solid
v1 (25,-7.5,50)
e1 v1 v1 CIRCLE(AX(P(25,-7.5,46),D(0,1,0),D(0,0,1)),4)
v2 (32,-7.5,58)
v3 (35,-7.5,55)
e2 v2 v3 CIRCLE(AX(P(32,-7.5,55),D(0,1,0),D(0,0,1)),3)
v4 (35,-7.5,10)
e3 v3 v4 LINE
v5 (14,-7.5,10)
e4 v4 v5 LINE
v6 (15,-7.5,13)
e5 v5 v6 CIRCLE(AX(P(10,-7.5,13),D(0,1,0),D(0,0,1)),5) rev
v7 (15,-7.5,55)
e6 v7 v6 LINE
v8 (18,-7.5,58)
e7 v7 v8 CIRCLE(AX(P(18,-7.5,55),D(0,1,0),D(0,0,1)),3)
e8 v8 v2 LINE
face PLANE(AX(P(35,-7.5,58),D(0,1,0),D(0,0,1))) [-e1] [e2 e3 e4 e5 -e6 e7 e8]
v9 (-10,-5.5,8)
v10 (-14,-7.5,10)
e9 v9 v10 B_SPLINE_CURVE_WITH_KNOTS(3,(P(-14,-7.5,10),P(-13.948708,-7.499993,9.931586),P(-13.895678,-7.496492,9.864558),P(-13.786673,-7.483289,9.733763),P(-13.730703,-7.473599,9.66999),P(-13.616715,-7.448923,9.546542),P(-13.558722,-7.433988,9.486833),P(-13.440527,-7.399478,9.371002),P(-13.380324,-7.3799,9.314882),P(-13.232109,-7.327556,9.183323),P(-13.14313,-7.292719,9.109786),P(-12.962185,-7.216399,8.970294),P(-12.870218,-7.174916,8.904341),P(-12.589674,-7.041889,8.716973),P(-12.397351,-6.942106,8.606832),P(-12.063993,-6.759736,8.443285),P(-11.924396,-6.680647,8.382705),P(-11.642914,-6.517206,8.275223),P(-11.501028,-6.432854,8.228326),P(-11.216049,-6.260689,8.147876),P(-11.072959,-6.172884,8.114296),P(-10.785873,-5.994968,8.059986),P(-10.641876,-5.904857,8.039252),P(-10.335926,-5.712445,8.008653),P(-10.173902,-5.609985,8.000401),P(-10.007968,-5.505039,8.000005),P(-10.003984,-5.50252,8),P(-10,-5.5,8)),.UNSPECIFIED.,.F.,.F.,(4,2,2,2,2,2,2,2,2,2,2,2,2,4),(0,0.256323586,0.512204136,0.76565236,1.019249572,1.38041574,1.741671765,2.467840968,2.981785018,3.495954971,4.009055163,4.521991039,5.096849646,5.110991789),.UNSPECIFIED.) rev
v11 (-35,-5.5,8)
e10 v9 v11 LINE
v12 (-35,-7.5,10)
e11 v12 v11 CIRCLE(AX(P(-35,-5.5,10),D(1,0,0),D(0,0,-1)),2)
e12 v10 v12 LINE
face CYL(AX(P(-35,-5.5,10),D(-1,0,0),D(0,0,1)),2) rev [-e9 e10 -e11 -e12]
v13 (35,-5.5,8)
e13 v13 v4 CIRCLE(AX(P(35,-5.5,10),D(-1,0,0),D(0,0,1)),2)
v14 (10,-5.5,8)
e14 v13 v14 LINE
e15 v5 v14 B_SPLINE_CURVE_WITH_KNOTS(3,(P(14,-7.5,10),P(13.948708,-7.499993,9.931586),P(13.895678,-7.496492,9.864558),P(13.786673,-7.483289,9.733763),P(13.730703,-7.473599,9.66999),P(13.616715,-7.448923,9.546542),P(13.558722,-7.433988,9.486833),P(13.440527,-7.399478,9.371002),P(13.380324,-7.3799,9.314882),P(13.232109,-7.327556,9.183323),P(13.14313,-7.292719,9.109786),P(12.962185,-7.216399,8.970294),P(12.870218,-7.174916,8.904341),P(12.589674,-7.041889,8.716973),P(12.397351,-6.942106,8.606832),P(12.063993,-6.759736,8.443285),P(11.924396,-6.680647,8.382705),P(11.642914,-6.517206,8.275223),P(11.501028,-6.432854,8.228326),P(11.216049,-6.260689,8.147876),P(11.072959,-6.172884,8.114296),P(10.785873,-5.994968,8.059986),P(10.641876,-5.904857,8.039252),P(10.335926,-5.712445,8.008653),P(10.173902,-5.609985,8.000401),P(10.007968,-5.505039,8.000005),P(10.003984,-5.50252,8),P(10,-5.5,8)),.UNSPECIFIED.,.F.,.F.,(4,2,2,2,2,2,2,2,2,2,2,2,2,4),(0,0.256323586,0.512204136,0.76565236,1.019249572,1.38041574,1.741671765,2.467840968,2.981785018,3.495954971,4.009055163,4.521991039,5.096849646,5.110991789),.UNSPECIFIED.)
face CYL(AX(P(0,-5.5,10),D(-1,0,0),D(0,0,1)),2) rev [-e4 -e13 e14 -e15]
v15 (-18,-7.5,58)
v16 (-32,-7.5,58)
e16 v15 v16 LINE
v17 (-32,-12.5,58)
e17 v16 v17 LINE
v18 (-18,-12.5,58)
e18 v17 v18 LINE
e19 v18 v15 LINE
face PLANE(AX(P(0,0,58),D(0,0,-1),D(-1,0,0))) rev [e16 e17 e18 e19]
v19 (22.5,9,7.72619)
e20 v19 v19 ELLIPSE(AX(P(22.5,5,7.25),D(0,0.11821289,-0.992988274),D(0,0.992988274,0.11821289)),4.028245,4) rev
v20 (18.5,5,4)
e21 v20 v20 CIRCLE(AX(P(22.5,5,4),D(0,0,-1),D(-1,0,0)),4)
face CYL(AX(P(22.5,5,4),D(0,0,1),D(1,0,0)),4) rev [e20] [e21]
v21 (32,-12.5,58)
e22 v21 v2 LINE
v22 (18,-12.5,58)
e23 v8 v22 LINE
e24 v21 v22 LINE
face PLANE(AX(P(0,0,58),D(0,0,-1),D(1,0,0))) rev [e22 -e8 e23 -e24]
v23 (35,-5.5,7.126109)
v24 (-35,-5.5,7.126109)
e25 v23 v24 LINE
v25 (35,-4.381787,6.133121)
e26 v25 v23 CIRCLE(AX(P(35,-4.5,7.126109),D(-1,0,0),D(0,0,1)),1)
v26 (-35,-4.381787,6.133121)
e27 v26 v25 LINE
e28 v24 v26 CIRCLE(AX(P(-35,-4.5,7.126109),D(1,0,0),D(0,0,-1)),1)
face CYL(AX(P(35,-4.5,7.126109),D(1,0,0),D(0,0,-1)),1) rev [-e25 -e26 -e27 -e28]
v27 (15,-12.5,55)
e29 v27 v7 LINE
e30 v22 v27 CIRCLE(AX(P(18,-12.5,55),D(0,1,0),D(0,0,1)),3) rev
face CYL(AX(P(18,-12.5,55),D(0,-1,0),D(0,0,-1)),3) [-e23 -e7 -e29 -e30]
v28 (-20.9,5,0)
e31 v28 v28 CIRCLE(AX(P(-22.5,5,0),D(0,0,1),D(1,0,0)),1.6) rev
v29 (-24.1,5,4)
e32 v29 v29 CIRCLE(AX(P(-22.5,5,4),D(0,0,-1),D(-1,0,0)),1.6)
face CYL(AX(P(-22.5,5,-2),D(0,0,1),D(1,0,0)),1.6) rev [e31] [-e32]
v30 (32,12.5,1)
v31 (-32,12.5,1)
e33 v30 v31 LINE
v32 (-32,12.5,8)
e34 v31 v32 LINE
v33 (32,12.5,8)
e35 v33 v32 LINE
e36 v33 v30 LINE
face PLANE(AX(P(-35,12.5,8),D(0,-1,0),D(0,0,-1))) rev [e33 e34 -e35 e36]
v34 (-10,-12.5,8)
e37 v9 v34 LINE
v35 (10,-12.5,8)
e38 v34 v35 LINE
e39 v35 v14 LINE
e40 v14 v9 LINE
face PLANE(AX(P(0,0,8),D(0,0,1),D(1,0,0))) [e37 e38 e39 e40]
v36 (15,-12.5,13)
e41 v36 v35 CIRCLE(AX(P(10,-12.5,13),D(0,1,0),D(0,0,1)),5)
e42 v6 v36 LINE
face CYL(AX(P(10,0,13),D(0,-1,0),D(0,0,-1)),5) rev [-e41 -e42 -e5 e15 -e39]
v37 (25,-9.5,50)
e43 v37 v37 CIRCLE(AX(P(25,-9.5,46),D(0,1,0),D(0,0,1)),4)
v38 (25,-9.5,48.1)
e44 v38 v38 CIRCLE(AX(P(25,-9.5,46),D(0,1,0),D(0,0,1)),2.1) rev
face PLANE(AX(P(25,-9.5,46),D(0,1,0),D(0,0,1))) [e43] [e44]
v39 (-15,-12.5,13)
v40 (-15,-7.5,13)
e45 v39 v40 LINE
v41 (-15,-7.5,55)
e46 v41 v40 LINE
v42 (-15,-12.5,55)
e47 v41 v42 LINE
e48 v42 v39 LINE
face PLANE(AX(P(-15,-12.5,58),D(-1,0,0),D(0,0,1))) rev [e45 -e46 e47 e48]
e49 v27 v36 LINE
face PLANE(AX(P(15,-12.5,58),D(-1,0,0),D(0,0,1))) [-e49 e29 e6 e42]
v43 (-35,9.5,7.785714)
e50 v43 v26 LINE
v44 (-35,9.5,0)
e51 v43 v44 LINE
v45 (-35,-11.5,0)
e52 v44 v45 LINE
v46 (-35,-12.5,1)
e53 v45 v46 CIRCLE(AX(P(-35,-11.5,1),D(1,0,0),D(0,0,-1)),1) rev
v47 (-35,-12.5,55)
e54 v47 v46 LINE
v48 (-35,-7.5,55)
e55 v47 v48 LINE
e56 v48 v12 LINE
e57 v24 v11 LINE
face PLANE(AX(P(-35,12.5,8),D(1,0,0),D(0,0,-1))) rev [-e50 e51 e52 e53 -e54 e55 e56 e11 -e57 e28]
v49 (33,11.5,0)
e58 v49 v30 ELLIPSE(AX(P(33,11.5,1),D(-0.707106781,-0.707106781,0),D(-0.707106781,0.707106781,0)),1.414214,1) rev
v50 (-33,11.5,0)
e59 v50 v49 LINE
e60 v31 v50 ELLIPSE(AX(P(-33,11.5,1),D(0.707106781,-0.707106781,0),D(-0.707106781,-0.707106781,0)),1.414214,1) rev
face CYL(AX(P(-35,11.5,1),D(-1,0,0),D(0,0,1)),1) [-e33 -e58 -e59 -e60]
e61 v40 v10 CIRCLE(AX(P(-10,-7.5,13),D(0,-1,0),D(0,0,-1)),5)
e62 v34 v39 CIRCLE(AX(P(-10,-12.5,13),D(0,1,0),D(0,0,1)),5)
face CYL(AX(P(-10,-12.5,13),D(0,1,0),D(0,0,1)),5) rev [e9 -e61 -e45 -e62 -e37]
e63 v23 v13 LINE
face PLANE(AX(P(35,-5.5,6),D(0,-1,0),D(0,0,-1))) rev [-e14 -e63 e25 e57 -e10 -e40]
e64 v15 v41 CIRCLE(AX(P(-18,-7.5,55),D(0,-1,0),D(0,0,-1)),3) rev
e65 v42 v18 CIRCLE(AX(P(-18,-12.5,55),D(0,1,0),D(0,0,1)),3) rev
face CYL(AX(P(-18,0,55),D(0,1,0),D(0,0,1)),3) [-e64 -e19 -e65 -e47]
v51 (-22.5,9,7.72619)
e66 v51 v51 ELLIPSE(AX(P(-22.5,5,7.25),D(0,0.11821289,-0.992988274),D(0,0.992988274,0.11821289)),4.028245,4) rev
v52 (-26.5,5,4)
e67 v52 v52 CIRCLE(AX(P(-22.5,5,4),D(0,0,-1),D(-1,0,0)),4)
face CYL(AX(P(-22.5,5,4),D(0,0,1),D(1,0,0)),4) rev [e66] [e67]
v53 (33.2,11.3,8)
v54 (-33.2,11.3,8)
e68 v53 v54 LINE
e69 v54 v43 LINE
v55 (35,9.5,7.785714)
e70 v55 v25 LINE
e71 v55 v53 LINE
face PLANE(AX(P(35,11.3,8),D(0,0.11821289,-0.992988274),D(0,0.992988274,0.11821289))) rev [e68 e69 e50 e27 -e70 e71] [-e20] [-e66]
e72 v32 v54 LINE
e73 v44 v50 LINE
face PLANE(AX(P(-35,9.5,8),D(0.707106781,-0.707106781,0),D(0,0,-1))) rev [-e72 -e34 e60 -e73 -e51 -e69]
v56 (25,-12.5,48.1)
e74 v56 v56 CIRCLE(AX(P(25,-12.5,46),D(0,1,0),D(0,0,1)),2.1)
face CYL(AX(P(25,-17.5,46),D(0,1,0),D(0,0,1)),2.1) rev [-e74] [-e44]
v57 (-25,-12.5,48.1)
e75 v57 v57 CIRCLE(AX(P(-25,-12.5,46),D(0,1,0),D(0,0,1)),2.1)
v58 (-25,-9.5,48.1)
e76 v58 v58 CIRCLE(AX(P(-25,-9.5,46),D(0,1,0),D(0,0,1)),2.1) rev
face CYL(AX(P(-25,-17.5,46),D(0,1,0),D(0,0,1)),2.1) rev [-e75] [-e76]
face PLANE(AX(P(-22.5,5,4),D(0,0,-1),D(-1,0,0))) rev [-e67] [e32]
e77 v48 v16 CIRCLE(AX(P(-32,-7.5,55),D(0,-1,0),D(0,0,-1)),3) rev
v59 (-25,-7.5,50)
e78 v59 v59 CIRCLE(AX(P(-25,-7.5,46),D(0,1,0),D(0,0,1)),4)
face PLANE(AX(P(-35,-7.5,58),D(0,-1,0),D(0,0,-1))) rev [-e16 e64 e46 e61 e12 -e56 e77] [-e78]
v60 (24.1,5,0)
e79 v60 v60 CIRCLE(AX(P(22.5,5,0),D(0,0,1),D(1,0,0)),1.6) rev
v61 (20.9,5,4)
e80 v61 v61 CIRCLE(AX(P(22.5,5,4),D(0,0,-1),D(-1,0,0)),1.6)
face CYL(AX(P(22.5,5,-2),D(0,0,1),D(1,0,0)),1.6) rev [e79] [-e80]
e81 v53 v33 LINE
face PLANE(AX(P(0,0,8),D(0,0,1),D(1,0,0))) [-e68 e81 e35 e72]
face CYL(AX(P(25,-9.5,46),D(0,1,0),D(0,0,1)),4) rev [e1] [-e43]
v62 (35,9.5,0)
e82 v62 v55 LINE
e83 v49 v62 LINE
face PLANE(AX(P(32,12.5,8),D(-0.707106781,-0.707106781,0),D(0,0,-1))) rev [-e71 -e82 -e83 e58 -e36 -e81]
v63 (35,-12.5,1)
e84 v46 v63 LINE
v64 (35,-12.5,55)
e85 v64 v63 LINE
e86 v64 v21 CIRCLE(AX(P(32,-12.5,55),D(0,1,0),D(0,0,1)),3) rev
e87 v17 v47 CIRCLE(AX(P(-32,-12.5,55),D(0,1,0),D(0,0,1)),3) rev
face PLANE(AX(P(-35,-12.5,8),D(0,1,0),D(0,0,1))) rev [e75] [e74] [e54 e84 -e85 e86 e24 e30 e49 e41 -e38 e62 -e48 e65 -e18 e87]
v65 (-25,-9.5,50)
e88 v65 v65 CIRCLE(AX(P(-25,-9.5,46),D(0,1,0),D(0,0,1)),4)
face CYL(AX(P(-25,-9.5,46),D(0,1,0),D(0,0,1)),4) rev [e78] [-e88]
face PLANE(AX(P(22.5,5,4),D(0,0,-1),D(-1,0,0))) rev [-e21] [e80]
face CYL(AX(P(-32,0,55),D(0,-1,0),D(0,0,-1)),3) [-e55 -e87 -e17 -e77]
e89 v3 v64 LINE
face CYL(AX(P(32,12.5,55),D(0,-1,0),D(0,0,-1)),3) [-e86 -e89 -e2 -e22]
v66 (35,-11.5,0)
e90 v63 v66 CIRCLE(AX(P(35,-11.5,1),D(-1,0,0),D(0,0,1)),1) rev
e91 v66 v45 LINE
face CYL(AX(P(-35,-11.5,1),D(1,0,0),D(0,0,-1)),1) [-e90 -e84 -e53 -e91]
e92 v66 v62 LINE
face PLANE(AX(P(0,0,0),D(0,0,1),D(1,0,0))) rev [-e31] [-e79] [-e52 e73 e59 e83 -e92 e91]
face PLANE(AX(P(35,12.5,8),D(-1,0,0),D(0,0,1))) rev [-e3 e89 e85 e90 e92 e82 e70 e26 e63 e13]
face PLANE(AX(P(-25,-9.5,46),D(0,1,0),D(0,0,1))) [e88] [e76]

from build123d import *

# Parameters (mm, degrees)
SKETCH1_W           = 70
SKETCH1_H           = 25
BOSS_EXTRUDE1_DEPTH = 8
SKETCH4_W           = 20
SKETCH4_H           = 5
BOSS_EXTRUDE2_DEPTH = 50
CHAMFER1_SIZE       = 3
CUT_EXTRUDE5_DEPTH  = 92.761920207
FILLET13_R          = 5
FILLET14_R          = 2
FILLET15_R          = 1
SKETCH11_R          = 2.1
CUT_EXTRUDE6_DEPTH  = 10
FILLET18_R          = 3
FILLET20_R          = 1
SKETCH16_R          = 1.6
CUT_EXTRUDE11_DEPTH = 10
SKETCH17_R          = 4
CUT_EXTRUDE12_DEPTH = 4
SKETCH18_R          = 4
CUT_EXTRUDE13_DEPTH = 2


with BuildPart() as part:
    # Sketch1 → Boss-Extrude1 (new body)
    with BuildSketch(Plane.XY):
        Rectangle(SKETCH1_W, SKETCH1_H)
    extrude(amount=BOSS_EXTRUDE1_DEPTH)

    # Sketch4 → Boss-Extrude2 (add)
    with BuildSketch(Plane.XY.offset(8)):
        with Locations((-25, -10)):
            Rectangle(SKETCH4_W, SKETCH4_H)
    boss_extrude2 = extrude(amount=BOSS_EXTRUDE2_DEPTH)

    # Mirror1: Boss-Extrude2 across plane
    add(boss_extrude2.mirror(Plane.ZY))

    # Chamfer1
    chamfer1_edges = [part.edges().sort_by_distance(p)[0] for p in [
        (-35, 12.5, 4),
        (35, 12.5, 4),
    ]]
    chamfer(chamfer1_edges, length=CHAMFER1_SIZE)

    # Sketch10 → Cut-Extrude5 (cut, through all)
    with BuildSketch(Plane.ZY.offset(35)):
        Polygon((8, 11.3), (6, -5.5), (8, -5.5), align=None)
    extrude(amount=-CUT_EXTRUDE5_DEPTH, mode=Mode.SUBTRACT)

    # Fillet13
    fillet13_edges = [part.edges().sort_by_distance(p)[0] for p in [
        (-15, -10, 8),
        (15, -10, 8),
    ]]
    fillet(fillet13_edges, radius=FILLET13_R)

    # Fillet14
    fillet14_edges = [part.edges().sort_by_distance(p)[0] for p in [
        (22.5, -7.5, 8),
        (-22.5, -7.5, 8),
    ]]
    fillet(fillet14_edges, radius=FILLET14_R - 0.0001)  # a hair under: the kernel refuses the full size

    # Fillet15
    fillet15_edges = [part.edges().sort_by_distance(p)[0] for p in [
        (0, 12.5, 0),
        (0, -12.5, 0),
    ]]
    fillet(fillet15_edges, radius=FILLET15_R)

    # Sketch11 → Cut-Extrude6 (cut)
    with BuildSketch(Plane(origin=(0, -7.5, 0), x_dir=(1, 0, 0), z_dir=(0, 1, 0))):
        with Locations(Location((-25, -46, 0), (0, 0, 270))):
            Circle(SKETCH11_R)
        with Locations(Location((25, -46, 0), (0, 0, 270))):
            Circle(SKETCH11_R)
    extrude(amount=-CUT_EXTRUDE6_DEPTH, mode=Mode.SUBTRACT)

    # Fillet18
    fillet18_edges = [part.edges().sort_by_distance(p)[0] for p in [
        (-35, -10, 58),
        (-15, -10, 58),
        (35, -10, 58),
        (15, -10, 58),
    ]]
    fillet(fillet18_edges, radius=FILLET18_R)

    # Fillet20
    fillet20_edges = [part.edges().sort_by_distance(p)[0] for p in [
        (0, -5.5, 6),
    ]]
    fillet(fillet20_edges, radius=FILLET20_R)

    # Sketch16 → Cut-Extrude11 (cut)
    with BuildSketch(Plane(origin=(0, 0, 8), x_dir=(-1, 0, 0), z_dir=(0, 0, -1))):
        with Locations(Location((-22.5, 5, 0), (0, 0, 180))):
            Circle(SKETCH16_R)
        with Locations(Location((22.5, 5, 0), (0, 0, 180))):
            Circle(SKETCH16_R)
    extrude(amount=CUT_EXTRUDE11_DEPTH, mode=Mode.SUBTRACT)

    # Sketch17 → Cut-Extrude12 (cut)
    with BuildSketch(Plane(origin=(0, 0, 8), x_dir=(-1, 0, 0), z_dir=(0, 0, -1))):
        with Locations(Location((-22.5, 5, 0), (0, 0, 90))):
            Circle(SKETCH17_R)
        with Locations(Location((22.5, 5, 0), (0, 0, 90))):
            Circle(SKETCH17_R)
    extrude(amount=CUT_EXTRUDE12_DEPTH, mode=Mode.SUBTRACT)

    # Sketch18 → Cut-Extrude13 (cut)
    with BuildSketch(Plane(origin=(0, -7.5, 0), x_dir=(1, 0, 0), z_dir=(0, 1, 0))):
        with Locations(Location((-25, -46, 0), (0, 0, 270))):
            Circle(SKETCH18_R)
        with Locations(Location((25, -46, 0), (0, 0, 270))):
            Circle(SKETCH18_R)
    extrude(amount=-CUT_EXTRUDE13_DEPTH, mode=Mode.SUBTRACT)


solid = part.part
